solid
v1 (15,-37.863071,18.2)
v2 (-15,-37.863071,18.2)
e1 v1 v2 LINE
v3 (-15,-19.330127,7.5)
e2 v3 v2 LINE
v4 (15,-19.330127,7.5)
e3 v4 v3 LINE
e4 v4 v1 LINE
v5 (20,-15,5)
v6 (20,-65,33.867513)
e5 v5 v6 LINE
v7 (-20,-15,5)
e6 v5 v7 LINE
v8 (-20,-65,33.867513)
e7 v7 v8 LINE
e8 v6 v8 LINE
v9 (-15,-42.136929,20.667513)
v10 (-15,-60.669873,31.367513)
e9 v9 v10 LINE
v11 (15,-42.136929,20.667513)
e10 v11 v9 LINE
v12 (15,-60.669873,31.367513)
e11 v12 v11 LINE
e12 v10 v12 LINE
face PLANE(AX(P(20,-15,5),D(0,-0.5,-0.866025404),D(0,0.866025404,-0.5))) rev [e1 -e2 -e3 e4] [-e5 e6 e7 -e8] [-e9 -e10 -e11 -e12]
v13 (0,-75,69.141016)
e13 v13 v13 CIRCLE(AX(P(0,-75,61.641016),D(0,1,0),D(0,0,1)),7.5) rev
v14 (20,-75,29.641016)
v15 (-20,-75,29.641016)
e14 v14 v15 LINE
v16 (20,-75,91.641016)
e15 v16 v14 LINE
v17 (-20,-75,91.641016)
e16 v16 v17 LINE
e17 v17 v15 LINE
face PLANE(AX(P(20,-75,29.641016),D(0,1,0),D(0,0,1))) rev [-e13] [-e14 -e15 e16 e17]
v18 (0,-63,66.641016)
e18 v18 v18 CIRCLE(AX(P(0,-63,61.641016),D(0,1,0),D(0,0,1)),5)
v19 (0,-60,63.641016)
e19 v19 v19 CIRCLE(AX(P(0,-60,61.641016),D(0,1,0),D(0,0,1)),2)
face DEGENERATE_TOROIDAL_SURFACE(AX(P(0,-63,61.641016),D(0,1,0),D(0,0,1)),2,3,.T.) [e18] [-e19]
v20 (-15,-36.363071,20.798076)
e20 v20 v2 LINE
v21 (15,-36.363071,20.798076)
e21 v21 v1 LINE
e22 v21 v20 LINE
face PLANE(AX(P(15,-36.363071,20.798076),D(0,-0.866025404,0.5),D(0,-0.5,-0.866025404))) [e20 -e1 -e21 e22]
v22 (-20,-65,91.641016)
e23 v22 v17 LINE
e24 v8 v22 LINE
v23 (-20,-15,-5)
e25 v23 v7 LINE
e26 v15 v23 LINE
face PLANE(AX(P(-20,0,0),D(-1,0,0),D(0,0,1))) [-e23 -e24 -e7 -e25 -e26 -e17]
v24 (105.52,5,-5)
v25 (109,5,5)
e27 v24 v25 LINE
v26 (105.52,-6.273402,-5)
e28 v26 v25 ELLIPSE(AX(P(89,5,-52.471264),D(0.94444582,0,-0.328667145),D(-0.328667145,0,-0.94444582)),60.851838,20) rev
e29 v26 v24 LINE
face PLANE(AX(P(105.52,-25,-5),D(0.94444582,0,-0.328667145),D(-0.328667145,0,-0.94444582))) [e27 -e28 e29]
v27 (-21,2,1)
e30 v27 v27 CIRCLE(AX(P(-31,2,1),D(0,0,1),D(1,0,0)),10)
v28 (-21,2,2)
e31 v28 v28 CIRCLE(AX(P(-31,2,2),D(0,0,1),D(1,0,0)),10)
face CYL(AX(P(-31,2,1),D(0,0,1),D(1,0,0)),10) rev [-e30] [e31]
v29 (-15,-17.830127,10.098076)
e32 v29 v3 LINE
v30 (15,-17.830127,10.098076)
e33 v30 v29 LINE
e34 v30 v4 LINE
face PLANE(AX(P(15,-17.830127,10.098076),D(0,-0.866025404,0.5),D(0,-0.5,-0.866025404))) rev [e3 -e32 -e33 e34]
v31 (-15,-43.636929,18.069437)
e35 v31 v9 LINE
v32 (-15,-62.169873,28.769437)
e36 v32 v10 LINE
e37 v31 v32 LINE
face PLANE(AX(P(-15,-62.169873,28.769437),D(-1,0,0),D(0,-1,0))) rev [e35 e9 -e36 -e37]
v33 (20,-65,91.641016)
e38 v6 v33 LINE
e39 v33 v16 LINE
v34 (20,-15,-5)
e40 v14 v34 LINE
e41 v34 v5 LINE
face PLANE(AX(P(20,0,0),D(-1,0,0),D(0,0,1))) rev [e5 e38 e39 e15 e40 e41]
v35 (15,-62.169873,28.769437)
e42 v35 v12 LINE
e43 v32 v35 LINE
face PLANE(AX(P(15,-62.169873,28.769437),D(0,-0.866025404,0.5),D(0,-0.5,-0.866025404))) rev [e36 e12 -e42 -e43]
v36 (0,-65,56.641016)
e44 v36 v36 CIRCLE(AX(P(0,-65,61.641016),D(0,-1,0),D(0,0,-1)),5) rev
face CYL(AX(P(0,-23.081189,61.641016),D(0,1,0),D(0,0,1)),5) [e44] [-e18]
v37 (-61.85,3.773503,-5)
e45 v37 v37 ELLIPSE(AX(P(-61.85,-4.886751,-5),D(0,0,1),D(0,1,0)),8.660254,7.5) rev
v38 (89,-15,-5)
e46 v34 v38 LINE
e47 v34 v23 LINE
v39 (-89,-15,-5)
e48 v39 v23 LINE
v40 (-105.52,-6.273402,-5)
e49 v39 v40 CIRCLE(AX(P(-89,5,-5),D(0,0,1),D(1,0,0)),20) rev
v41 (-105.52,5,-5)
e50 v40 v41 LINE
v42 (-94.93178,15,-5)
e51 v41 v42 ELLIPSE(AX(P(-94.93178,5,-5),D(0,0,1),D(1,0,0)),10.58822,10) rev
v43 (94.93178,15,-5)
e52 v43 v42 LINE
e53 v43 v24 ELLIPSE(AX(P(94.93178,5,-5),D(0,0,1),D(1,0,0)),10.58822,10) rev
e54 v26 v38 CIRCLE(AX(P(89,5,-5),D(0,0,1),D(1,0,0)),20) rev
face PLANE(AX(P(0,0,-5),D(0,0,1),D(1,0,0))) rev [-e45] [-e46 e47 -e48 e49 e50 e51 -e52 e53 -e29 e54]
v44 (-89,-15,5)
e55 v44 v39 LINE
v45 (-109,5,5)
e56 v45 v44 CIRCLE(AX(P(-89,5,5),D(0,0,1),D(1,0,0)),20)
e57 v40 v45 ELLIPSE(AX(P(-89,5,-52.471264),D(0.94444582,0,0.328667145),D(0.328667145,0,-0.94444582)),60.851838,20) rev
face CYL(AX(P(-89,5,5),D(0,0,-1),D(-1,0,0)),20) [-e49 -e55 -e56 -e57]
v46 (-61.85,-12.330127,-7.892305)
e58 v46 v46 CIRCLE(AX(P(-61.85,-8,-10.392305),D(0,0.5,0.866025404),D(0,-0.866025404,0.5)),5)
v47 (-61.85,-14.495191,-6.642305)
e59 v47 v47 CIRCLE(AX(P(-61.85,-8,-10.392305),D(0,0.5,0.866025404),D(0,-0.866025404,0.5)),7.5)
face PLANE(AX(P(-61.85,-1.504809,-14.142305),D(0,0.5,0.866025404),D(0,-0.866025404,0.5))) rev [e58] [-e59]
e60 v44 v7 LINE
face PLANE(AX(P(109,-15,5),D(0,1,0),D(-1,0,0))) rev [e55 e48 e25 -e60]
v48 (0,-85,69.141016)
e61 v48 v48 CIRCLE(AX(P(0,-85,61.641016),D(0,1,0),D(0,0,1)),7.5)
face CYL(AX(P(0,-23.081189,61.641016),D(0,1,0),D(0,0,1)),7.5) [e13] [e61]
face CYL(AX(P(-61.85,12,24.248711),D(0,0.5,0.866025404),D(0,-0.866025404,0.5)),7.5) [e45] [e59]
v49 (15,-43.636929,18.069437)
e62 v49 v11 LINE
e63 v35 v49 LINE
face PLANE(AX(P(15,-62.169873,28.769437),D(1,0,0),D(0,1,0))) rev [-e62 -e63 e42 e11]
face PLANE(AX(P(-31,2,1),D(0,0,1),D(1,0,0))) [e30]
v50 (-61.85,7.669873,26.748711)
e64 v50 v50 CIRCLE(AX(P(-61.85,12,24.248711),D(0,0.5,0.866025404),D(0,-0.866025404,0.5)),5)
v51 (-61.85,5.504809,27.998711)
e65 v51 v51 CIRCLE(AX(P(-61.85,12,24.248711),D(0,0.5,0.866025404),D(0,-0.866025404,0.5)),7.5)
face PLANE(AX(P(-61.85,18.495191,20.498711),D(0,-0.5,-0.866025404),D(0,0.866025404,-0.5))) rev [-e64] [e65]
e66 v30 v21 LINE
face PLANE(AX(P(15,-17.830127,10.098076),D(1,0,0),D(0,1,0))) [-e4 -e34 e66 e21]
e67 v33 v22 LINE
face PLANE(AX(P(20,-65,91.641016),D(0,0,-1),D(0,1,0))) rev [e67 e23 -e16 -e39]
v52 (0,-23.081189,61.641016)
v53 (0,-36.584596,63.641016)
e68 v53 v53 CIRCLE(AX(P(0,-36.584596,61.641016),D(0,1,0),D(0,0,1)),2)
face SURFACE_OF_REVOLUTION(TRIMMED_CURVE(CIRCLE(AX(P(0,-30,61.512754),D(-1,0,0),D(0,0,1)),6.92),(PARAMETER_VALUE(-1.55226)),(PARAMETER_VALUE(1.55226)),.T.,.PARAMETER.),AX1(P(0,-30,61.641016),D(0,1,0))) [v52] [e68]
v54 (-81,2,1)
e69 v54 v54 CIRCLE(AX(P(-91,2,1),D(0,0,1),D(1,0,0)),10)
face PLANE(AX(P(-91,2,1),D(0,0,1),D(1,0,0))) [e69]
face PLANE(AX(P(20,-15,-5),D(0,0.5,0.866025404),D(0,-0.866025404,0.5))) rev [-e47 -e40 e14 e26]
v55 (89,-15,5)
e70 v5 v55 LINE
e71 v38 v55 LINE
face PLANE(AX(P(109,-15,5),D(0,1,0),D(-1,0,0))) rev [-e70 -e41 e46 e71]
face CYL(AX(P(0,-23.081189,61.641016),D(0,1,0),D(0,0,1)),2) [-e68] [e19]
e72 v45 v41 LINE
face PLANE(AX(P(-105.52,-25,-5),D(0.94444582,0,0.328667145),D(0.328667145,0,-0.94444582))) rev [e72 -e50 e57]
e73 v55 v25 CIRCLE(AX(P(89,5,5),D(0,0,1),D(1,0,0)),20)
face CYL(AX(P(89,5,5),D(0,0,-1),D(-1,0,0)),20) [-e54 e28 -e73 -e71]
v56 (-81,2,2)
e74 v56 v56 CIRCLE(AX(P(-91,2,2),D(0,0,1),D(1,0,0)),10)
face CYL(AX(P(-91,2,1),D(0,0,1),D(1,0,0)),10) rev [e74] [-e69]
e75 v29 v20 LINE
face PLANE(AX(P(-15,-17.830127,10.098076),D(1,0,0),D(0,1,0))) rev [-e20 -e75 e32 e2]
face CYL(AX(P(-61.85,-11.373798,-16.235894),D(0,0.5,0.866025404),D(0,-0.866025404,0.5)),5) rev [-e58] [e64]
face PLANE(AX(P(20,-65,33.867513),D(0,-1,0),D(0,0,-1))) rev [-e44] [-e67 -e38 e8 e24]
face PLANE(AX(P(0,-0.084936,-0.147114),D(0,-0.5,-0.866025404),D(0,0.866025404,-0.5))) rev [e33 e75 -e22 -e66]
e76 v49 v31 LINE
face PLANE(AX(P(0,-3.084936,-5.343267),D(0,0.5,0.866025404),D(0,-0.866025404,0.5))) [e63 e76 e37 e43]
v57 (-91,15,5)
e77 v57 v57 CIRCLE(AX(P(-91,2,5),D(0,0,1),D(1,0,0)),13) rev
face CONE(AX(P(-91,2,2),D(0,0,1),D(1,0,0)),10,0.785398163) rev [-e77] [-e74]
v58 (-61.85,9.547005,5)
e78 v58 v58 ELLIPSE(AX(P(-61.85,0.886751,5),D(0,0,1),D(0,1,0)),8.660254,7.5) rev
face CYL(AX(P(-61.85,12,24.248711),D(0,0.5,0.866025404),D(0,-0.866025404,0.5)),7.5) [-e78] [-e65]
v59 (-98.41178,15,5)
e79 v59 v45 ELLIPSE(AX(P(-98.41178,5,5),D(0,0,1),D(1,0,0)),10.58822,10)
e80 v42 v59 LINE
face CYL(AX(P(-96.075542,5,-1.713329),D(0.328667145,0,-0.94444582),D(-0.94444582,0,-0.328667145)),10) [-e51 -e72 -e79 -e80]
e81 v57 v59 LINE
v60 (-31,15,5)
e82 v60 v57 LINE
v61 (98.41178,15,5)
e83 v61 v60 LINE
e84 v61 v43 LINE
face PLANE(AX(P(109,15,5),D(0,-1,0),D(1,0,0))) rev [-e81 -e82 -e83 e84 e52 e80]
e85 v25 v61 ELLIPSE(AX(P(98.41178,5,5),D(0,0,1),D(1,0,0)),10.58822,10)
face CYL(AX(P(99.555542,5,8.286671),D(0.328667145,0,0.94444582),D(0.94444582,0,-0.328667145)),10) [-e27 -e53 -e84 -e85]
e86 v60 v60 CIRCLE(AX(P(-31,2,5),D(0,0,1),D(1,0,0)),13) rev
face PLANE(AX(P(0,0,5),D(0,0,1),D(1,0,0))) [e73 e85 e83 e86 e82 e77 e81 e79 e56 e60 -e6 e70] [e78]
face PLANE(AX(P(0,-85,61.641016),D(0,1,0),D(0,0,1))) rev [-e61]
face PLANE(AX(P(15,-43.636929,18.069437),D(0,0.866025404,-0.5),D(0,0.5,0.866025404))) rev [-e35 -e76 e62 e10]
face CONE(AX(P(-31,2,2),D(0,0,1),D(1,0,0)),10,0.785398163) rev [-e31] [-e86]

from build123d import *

# Parameters (mm, degrees)
SKETCH2_W            = 218
SKETCH2_H            = 30
BOSS_EXTRUDE1_DEPTH  = 5
FILLET1_R            = 20
SKETCH3_R            = 10
CUT_EXTRUDE1_DEPTH   = 4
SKETCH3_3_R          = 10
CUT_EXTRUDE2_DEPTH   = 4
CHAMFER1_SIZE        = 3
SKETCH6_R            = 5
CUT_EXTRUDE3_DEPTH   = 119.749210232
BOSS_EXTRUDE2_DEPTH  = 20
SKETCH8_W            = 30
SKETCH8_H            = 21.4
BOSS_EXTRUDE3_DEPTH  = 3
SKETCH10_W           = 30
SKETCH10_H           = 21.4
CUT_EXTRUDE4_DEPTH   = 3
CUT_EXTRUDE5_DEPTH   = 40
FILLET2_R            = 10
FILLET2_OF_MIRROR1_R = 10


with BuildPart() as part:
    # Sketch2 → Boss-Extrude1 (new, symmetric)
    with BuildSketch(Plane.XY):
        Rectangle(SKETCH2_W, SKETCH2_H)
    extrude(amount=BOSS_EXTRUDE1_DEPTH, both=True)

    # Fillet1
    fillet1_edges = [part.edges().sort_by_distance(p)[0] for p in [
        (109, -15, 0),
        (-109, -15, 0),
    ]]
    fillet(fillet1_edges, radius=FILLET1_R)

    # Sketch3 → Cut-Extrude1 (cut)
    with BuildSketch(Plane.XY.offset(5)):
        with Locations((-91, 2)):
            Circle(SKETCH3_R)
    extrude(amount=-CUT_EXTRUDE1_DEPTH, mode=Mode.SUBTRACT)

    # Sketch3<3> → Cut-Extrude2 (cut)
    with BuildSketch(Plane.XY.offset(5)):
        with Locations((-91, 2)):
            Circle(SKETCH3_3_R)
        with Locations((-31, 2)):
            Circle(SKETCH3_3_R)
    extrude(amount=-CUT_EXTRUDE2_DEPTH, mode=Mode.SUBTRACT)

    # Chamfer1
    chamfer1_edges = [part.edges().sort_by_distance(p)[0] for p in [
        (-101, 2, 5),
        (-41, 2, 5),
    ]]
    chamfer(chamfer1_edges, length=CHAMFER1_SIZE - 0.0001)  # a hair under: the kernel refuses the full size

    # Sketch5 → Revolve1 (revolve)
    with BuildSketch(Plane(origin=(-61.85, 0, 0), x_dir=(0, 0, -1), z_dir=(1, 0, 0)), mode=Mode.PRIVATE) as revolve1_sk:
        Polygon((-20.498711306, 18.495190528), (-24.248711306, 12), (10.392304845, -8), (14.142304845, -1.504809472), align=None)
    revolve(revolve1_sk.sketch.rotate(Axis((-61.85, 12, 24.248711306), (0, -0.49999999999999767, -0.86602540378444)), 180), axis=Axis((-61.85, 12, 24.248711306), (0, -0.49999999999999767, -0.86602540378444)))

    # Sketch6 → Cut-Extrude3 (cut, through all)
    with BuildSketch(Plane(origin=(0, 13.5, 23.382685902), x_dir=(1, 0, 0), z_dir=(0, 0.4999999999999978, 0.86602540378444))):
        with Locations(Location((-61.85, -1.732050808, 0), (0, 0, 270))):
            Circle(SKETCH6_R)
    extrude(amount=-CUT_EXTRUDE3_DEPTH, mode=Mode.SUBTRACT)

    # Sketch7 → Boss-Extrude2 (add, symmetric)
    with BuildSketch(Plane(origin=(0, 0, 0), x_dir=(0, 0, -1), z_dir=(1, 0, 0))):
        Polygon((5, -15), (-5, -15), (-33.867513459, -65), (-91.641016151, -65), (-91.641016151, -75), (-29.641016151, -75), align=None)
    extrude(amount=BOSS_EXTRUDE2_DEPTH, both=True)

    # Sketch8 → Boss-Extrude3 (add)
    with BuildSketch(Plane(origin=(0, -1.584936491, -2.745190528), x_dir=(1, 0, 0), z_dir=(0, 0.4999999999999978, 0.86602540378444))):
        with Locations((0, -31.190381057)):
            Rectangle(SKETCH8_W, SKETCH8_H)
    extrude(amount=BOSS_EXTRUDE3_DEPTH)

    # Sketch10 → Cut-Extrude4 (cut)
    with BuildSketch(Plane(origin=(0, -1.584936491, -2.745190528), x_dir=(1, 0, 0), z_dir=(0, 0.499999999999998, 0.8660254037844398))):
        with Locations((0, -57.525407976)):
            Rectangle(SKETCH10_W, SKETCH10_H)
    extrude(amount=-CUT_EXTRUDE4_DEPTH, mode=Mode.SUBTRACT)

    # Sketch11 → Revolve2 (revolve)
    with BuildSketch(Plane(origin=(0, 0, 0), x_dir=(0, 0, -1), z_dir=(1, 0, 0)), mode=Mode.PRIVATE) as revolve2_sk:
        with BuildLine():
            Line((-61.641016151, -23.08118878), (-61.641016151, -85))
            Line((-61.641016151, -85), (-54.141016151, -85))
            Line((-54.141016151, -85), (-54.141016151, -75))
            Line((-54.141016151, -75), (-56.641016151, -75))
            Line((-56.641016151, -75), (-56.641016151, -63))
            ThreePointArc((-56.641016151, -63), (-57.519695808, -60.878679656), (-59.641016151, -60))
            Line((-59.641016151, -60), (-59.641016151, -36.58459552))
            ThreePointArc((-59.641016151, -36.58459552), (-54.92395374, -28.986133621), (-61.641016151, -23.08118878))
        make_face()
    revolve(revolve2_sk.sketch.rotate(Axis((0, -23.08118878, 61.641016151), (0, -1, 0)), 180), axis=Axis((0, -23.08118878, 61.641016151), (0, -1, 0)))

    # Sketch12 → Cut-Extrude5 (cut)
    with BuildSketch(Plane(origin=(0, 15, 0), x_dir=(1, 0, 0), z_dir=(0, 1, 0))):
        Polygon((-109, -5), (-109, 5), (-105.52, 5), align=None)
    cut_extrude5 = extrude(amount=-CUT_EXTRUDE5_DEPTH, mode=Mode.SUBTRACT)

    # Fillet2
    fillet2_edges = [part.edges().sort_by_distance(p)[0] for p in [
        (-107.26, 15, 0),
    ]]
    fillet(fillet2_edges, radius=FILLET2_R)

    # Mirror1: Cut-Extrude5 across plane
    add(cut_extrude5.mirror(Plane(origin=(0, 0, 0), x_dir=(0, 0, 1), z_dir=(1, 0, 0))), mode=Mode.SUBTRACT)

    # Fillet2 of Mirror1
    fillet2_of_mirror1_edges = [part.edges().sort_by_distance(p)[0] for p in [
        (107.26, 15, 0),
    ]]
    fillet(fillet2_of_mirror1_edges, radius=FILLET2_OF_MIRROR1_R)


solid = part.part
